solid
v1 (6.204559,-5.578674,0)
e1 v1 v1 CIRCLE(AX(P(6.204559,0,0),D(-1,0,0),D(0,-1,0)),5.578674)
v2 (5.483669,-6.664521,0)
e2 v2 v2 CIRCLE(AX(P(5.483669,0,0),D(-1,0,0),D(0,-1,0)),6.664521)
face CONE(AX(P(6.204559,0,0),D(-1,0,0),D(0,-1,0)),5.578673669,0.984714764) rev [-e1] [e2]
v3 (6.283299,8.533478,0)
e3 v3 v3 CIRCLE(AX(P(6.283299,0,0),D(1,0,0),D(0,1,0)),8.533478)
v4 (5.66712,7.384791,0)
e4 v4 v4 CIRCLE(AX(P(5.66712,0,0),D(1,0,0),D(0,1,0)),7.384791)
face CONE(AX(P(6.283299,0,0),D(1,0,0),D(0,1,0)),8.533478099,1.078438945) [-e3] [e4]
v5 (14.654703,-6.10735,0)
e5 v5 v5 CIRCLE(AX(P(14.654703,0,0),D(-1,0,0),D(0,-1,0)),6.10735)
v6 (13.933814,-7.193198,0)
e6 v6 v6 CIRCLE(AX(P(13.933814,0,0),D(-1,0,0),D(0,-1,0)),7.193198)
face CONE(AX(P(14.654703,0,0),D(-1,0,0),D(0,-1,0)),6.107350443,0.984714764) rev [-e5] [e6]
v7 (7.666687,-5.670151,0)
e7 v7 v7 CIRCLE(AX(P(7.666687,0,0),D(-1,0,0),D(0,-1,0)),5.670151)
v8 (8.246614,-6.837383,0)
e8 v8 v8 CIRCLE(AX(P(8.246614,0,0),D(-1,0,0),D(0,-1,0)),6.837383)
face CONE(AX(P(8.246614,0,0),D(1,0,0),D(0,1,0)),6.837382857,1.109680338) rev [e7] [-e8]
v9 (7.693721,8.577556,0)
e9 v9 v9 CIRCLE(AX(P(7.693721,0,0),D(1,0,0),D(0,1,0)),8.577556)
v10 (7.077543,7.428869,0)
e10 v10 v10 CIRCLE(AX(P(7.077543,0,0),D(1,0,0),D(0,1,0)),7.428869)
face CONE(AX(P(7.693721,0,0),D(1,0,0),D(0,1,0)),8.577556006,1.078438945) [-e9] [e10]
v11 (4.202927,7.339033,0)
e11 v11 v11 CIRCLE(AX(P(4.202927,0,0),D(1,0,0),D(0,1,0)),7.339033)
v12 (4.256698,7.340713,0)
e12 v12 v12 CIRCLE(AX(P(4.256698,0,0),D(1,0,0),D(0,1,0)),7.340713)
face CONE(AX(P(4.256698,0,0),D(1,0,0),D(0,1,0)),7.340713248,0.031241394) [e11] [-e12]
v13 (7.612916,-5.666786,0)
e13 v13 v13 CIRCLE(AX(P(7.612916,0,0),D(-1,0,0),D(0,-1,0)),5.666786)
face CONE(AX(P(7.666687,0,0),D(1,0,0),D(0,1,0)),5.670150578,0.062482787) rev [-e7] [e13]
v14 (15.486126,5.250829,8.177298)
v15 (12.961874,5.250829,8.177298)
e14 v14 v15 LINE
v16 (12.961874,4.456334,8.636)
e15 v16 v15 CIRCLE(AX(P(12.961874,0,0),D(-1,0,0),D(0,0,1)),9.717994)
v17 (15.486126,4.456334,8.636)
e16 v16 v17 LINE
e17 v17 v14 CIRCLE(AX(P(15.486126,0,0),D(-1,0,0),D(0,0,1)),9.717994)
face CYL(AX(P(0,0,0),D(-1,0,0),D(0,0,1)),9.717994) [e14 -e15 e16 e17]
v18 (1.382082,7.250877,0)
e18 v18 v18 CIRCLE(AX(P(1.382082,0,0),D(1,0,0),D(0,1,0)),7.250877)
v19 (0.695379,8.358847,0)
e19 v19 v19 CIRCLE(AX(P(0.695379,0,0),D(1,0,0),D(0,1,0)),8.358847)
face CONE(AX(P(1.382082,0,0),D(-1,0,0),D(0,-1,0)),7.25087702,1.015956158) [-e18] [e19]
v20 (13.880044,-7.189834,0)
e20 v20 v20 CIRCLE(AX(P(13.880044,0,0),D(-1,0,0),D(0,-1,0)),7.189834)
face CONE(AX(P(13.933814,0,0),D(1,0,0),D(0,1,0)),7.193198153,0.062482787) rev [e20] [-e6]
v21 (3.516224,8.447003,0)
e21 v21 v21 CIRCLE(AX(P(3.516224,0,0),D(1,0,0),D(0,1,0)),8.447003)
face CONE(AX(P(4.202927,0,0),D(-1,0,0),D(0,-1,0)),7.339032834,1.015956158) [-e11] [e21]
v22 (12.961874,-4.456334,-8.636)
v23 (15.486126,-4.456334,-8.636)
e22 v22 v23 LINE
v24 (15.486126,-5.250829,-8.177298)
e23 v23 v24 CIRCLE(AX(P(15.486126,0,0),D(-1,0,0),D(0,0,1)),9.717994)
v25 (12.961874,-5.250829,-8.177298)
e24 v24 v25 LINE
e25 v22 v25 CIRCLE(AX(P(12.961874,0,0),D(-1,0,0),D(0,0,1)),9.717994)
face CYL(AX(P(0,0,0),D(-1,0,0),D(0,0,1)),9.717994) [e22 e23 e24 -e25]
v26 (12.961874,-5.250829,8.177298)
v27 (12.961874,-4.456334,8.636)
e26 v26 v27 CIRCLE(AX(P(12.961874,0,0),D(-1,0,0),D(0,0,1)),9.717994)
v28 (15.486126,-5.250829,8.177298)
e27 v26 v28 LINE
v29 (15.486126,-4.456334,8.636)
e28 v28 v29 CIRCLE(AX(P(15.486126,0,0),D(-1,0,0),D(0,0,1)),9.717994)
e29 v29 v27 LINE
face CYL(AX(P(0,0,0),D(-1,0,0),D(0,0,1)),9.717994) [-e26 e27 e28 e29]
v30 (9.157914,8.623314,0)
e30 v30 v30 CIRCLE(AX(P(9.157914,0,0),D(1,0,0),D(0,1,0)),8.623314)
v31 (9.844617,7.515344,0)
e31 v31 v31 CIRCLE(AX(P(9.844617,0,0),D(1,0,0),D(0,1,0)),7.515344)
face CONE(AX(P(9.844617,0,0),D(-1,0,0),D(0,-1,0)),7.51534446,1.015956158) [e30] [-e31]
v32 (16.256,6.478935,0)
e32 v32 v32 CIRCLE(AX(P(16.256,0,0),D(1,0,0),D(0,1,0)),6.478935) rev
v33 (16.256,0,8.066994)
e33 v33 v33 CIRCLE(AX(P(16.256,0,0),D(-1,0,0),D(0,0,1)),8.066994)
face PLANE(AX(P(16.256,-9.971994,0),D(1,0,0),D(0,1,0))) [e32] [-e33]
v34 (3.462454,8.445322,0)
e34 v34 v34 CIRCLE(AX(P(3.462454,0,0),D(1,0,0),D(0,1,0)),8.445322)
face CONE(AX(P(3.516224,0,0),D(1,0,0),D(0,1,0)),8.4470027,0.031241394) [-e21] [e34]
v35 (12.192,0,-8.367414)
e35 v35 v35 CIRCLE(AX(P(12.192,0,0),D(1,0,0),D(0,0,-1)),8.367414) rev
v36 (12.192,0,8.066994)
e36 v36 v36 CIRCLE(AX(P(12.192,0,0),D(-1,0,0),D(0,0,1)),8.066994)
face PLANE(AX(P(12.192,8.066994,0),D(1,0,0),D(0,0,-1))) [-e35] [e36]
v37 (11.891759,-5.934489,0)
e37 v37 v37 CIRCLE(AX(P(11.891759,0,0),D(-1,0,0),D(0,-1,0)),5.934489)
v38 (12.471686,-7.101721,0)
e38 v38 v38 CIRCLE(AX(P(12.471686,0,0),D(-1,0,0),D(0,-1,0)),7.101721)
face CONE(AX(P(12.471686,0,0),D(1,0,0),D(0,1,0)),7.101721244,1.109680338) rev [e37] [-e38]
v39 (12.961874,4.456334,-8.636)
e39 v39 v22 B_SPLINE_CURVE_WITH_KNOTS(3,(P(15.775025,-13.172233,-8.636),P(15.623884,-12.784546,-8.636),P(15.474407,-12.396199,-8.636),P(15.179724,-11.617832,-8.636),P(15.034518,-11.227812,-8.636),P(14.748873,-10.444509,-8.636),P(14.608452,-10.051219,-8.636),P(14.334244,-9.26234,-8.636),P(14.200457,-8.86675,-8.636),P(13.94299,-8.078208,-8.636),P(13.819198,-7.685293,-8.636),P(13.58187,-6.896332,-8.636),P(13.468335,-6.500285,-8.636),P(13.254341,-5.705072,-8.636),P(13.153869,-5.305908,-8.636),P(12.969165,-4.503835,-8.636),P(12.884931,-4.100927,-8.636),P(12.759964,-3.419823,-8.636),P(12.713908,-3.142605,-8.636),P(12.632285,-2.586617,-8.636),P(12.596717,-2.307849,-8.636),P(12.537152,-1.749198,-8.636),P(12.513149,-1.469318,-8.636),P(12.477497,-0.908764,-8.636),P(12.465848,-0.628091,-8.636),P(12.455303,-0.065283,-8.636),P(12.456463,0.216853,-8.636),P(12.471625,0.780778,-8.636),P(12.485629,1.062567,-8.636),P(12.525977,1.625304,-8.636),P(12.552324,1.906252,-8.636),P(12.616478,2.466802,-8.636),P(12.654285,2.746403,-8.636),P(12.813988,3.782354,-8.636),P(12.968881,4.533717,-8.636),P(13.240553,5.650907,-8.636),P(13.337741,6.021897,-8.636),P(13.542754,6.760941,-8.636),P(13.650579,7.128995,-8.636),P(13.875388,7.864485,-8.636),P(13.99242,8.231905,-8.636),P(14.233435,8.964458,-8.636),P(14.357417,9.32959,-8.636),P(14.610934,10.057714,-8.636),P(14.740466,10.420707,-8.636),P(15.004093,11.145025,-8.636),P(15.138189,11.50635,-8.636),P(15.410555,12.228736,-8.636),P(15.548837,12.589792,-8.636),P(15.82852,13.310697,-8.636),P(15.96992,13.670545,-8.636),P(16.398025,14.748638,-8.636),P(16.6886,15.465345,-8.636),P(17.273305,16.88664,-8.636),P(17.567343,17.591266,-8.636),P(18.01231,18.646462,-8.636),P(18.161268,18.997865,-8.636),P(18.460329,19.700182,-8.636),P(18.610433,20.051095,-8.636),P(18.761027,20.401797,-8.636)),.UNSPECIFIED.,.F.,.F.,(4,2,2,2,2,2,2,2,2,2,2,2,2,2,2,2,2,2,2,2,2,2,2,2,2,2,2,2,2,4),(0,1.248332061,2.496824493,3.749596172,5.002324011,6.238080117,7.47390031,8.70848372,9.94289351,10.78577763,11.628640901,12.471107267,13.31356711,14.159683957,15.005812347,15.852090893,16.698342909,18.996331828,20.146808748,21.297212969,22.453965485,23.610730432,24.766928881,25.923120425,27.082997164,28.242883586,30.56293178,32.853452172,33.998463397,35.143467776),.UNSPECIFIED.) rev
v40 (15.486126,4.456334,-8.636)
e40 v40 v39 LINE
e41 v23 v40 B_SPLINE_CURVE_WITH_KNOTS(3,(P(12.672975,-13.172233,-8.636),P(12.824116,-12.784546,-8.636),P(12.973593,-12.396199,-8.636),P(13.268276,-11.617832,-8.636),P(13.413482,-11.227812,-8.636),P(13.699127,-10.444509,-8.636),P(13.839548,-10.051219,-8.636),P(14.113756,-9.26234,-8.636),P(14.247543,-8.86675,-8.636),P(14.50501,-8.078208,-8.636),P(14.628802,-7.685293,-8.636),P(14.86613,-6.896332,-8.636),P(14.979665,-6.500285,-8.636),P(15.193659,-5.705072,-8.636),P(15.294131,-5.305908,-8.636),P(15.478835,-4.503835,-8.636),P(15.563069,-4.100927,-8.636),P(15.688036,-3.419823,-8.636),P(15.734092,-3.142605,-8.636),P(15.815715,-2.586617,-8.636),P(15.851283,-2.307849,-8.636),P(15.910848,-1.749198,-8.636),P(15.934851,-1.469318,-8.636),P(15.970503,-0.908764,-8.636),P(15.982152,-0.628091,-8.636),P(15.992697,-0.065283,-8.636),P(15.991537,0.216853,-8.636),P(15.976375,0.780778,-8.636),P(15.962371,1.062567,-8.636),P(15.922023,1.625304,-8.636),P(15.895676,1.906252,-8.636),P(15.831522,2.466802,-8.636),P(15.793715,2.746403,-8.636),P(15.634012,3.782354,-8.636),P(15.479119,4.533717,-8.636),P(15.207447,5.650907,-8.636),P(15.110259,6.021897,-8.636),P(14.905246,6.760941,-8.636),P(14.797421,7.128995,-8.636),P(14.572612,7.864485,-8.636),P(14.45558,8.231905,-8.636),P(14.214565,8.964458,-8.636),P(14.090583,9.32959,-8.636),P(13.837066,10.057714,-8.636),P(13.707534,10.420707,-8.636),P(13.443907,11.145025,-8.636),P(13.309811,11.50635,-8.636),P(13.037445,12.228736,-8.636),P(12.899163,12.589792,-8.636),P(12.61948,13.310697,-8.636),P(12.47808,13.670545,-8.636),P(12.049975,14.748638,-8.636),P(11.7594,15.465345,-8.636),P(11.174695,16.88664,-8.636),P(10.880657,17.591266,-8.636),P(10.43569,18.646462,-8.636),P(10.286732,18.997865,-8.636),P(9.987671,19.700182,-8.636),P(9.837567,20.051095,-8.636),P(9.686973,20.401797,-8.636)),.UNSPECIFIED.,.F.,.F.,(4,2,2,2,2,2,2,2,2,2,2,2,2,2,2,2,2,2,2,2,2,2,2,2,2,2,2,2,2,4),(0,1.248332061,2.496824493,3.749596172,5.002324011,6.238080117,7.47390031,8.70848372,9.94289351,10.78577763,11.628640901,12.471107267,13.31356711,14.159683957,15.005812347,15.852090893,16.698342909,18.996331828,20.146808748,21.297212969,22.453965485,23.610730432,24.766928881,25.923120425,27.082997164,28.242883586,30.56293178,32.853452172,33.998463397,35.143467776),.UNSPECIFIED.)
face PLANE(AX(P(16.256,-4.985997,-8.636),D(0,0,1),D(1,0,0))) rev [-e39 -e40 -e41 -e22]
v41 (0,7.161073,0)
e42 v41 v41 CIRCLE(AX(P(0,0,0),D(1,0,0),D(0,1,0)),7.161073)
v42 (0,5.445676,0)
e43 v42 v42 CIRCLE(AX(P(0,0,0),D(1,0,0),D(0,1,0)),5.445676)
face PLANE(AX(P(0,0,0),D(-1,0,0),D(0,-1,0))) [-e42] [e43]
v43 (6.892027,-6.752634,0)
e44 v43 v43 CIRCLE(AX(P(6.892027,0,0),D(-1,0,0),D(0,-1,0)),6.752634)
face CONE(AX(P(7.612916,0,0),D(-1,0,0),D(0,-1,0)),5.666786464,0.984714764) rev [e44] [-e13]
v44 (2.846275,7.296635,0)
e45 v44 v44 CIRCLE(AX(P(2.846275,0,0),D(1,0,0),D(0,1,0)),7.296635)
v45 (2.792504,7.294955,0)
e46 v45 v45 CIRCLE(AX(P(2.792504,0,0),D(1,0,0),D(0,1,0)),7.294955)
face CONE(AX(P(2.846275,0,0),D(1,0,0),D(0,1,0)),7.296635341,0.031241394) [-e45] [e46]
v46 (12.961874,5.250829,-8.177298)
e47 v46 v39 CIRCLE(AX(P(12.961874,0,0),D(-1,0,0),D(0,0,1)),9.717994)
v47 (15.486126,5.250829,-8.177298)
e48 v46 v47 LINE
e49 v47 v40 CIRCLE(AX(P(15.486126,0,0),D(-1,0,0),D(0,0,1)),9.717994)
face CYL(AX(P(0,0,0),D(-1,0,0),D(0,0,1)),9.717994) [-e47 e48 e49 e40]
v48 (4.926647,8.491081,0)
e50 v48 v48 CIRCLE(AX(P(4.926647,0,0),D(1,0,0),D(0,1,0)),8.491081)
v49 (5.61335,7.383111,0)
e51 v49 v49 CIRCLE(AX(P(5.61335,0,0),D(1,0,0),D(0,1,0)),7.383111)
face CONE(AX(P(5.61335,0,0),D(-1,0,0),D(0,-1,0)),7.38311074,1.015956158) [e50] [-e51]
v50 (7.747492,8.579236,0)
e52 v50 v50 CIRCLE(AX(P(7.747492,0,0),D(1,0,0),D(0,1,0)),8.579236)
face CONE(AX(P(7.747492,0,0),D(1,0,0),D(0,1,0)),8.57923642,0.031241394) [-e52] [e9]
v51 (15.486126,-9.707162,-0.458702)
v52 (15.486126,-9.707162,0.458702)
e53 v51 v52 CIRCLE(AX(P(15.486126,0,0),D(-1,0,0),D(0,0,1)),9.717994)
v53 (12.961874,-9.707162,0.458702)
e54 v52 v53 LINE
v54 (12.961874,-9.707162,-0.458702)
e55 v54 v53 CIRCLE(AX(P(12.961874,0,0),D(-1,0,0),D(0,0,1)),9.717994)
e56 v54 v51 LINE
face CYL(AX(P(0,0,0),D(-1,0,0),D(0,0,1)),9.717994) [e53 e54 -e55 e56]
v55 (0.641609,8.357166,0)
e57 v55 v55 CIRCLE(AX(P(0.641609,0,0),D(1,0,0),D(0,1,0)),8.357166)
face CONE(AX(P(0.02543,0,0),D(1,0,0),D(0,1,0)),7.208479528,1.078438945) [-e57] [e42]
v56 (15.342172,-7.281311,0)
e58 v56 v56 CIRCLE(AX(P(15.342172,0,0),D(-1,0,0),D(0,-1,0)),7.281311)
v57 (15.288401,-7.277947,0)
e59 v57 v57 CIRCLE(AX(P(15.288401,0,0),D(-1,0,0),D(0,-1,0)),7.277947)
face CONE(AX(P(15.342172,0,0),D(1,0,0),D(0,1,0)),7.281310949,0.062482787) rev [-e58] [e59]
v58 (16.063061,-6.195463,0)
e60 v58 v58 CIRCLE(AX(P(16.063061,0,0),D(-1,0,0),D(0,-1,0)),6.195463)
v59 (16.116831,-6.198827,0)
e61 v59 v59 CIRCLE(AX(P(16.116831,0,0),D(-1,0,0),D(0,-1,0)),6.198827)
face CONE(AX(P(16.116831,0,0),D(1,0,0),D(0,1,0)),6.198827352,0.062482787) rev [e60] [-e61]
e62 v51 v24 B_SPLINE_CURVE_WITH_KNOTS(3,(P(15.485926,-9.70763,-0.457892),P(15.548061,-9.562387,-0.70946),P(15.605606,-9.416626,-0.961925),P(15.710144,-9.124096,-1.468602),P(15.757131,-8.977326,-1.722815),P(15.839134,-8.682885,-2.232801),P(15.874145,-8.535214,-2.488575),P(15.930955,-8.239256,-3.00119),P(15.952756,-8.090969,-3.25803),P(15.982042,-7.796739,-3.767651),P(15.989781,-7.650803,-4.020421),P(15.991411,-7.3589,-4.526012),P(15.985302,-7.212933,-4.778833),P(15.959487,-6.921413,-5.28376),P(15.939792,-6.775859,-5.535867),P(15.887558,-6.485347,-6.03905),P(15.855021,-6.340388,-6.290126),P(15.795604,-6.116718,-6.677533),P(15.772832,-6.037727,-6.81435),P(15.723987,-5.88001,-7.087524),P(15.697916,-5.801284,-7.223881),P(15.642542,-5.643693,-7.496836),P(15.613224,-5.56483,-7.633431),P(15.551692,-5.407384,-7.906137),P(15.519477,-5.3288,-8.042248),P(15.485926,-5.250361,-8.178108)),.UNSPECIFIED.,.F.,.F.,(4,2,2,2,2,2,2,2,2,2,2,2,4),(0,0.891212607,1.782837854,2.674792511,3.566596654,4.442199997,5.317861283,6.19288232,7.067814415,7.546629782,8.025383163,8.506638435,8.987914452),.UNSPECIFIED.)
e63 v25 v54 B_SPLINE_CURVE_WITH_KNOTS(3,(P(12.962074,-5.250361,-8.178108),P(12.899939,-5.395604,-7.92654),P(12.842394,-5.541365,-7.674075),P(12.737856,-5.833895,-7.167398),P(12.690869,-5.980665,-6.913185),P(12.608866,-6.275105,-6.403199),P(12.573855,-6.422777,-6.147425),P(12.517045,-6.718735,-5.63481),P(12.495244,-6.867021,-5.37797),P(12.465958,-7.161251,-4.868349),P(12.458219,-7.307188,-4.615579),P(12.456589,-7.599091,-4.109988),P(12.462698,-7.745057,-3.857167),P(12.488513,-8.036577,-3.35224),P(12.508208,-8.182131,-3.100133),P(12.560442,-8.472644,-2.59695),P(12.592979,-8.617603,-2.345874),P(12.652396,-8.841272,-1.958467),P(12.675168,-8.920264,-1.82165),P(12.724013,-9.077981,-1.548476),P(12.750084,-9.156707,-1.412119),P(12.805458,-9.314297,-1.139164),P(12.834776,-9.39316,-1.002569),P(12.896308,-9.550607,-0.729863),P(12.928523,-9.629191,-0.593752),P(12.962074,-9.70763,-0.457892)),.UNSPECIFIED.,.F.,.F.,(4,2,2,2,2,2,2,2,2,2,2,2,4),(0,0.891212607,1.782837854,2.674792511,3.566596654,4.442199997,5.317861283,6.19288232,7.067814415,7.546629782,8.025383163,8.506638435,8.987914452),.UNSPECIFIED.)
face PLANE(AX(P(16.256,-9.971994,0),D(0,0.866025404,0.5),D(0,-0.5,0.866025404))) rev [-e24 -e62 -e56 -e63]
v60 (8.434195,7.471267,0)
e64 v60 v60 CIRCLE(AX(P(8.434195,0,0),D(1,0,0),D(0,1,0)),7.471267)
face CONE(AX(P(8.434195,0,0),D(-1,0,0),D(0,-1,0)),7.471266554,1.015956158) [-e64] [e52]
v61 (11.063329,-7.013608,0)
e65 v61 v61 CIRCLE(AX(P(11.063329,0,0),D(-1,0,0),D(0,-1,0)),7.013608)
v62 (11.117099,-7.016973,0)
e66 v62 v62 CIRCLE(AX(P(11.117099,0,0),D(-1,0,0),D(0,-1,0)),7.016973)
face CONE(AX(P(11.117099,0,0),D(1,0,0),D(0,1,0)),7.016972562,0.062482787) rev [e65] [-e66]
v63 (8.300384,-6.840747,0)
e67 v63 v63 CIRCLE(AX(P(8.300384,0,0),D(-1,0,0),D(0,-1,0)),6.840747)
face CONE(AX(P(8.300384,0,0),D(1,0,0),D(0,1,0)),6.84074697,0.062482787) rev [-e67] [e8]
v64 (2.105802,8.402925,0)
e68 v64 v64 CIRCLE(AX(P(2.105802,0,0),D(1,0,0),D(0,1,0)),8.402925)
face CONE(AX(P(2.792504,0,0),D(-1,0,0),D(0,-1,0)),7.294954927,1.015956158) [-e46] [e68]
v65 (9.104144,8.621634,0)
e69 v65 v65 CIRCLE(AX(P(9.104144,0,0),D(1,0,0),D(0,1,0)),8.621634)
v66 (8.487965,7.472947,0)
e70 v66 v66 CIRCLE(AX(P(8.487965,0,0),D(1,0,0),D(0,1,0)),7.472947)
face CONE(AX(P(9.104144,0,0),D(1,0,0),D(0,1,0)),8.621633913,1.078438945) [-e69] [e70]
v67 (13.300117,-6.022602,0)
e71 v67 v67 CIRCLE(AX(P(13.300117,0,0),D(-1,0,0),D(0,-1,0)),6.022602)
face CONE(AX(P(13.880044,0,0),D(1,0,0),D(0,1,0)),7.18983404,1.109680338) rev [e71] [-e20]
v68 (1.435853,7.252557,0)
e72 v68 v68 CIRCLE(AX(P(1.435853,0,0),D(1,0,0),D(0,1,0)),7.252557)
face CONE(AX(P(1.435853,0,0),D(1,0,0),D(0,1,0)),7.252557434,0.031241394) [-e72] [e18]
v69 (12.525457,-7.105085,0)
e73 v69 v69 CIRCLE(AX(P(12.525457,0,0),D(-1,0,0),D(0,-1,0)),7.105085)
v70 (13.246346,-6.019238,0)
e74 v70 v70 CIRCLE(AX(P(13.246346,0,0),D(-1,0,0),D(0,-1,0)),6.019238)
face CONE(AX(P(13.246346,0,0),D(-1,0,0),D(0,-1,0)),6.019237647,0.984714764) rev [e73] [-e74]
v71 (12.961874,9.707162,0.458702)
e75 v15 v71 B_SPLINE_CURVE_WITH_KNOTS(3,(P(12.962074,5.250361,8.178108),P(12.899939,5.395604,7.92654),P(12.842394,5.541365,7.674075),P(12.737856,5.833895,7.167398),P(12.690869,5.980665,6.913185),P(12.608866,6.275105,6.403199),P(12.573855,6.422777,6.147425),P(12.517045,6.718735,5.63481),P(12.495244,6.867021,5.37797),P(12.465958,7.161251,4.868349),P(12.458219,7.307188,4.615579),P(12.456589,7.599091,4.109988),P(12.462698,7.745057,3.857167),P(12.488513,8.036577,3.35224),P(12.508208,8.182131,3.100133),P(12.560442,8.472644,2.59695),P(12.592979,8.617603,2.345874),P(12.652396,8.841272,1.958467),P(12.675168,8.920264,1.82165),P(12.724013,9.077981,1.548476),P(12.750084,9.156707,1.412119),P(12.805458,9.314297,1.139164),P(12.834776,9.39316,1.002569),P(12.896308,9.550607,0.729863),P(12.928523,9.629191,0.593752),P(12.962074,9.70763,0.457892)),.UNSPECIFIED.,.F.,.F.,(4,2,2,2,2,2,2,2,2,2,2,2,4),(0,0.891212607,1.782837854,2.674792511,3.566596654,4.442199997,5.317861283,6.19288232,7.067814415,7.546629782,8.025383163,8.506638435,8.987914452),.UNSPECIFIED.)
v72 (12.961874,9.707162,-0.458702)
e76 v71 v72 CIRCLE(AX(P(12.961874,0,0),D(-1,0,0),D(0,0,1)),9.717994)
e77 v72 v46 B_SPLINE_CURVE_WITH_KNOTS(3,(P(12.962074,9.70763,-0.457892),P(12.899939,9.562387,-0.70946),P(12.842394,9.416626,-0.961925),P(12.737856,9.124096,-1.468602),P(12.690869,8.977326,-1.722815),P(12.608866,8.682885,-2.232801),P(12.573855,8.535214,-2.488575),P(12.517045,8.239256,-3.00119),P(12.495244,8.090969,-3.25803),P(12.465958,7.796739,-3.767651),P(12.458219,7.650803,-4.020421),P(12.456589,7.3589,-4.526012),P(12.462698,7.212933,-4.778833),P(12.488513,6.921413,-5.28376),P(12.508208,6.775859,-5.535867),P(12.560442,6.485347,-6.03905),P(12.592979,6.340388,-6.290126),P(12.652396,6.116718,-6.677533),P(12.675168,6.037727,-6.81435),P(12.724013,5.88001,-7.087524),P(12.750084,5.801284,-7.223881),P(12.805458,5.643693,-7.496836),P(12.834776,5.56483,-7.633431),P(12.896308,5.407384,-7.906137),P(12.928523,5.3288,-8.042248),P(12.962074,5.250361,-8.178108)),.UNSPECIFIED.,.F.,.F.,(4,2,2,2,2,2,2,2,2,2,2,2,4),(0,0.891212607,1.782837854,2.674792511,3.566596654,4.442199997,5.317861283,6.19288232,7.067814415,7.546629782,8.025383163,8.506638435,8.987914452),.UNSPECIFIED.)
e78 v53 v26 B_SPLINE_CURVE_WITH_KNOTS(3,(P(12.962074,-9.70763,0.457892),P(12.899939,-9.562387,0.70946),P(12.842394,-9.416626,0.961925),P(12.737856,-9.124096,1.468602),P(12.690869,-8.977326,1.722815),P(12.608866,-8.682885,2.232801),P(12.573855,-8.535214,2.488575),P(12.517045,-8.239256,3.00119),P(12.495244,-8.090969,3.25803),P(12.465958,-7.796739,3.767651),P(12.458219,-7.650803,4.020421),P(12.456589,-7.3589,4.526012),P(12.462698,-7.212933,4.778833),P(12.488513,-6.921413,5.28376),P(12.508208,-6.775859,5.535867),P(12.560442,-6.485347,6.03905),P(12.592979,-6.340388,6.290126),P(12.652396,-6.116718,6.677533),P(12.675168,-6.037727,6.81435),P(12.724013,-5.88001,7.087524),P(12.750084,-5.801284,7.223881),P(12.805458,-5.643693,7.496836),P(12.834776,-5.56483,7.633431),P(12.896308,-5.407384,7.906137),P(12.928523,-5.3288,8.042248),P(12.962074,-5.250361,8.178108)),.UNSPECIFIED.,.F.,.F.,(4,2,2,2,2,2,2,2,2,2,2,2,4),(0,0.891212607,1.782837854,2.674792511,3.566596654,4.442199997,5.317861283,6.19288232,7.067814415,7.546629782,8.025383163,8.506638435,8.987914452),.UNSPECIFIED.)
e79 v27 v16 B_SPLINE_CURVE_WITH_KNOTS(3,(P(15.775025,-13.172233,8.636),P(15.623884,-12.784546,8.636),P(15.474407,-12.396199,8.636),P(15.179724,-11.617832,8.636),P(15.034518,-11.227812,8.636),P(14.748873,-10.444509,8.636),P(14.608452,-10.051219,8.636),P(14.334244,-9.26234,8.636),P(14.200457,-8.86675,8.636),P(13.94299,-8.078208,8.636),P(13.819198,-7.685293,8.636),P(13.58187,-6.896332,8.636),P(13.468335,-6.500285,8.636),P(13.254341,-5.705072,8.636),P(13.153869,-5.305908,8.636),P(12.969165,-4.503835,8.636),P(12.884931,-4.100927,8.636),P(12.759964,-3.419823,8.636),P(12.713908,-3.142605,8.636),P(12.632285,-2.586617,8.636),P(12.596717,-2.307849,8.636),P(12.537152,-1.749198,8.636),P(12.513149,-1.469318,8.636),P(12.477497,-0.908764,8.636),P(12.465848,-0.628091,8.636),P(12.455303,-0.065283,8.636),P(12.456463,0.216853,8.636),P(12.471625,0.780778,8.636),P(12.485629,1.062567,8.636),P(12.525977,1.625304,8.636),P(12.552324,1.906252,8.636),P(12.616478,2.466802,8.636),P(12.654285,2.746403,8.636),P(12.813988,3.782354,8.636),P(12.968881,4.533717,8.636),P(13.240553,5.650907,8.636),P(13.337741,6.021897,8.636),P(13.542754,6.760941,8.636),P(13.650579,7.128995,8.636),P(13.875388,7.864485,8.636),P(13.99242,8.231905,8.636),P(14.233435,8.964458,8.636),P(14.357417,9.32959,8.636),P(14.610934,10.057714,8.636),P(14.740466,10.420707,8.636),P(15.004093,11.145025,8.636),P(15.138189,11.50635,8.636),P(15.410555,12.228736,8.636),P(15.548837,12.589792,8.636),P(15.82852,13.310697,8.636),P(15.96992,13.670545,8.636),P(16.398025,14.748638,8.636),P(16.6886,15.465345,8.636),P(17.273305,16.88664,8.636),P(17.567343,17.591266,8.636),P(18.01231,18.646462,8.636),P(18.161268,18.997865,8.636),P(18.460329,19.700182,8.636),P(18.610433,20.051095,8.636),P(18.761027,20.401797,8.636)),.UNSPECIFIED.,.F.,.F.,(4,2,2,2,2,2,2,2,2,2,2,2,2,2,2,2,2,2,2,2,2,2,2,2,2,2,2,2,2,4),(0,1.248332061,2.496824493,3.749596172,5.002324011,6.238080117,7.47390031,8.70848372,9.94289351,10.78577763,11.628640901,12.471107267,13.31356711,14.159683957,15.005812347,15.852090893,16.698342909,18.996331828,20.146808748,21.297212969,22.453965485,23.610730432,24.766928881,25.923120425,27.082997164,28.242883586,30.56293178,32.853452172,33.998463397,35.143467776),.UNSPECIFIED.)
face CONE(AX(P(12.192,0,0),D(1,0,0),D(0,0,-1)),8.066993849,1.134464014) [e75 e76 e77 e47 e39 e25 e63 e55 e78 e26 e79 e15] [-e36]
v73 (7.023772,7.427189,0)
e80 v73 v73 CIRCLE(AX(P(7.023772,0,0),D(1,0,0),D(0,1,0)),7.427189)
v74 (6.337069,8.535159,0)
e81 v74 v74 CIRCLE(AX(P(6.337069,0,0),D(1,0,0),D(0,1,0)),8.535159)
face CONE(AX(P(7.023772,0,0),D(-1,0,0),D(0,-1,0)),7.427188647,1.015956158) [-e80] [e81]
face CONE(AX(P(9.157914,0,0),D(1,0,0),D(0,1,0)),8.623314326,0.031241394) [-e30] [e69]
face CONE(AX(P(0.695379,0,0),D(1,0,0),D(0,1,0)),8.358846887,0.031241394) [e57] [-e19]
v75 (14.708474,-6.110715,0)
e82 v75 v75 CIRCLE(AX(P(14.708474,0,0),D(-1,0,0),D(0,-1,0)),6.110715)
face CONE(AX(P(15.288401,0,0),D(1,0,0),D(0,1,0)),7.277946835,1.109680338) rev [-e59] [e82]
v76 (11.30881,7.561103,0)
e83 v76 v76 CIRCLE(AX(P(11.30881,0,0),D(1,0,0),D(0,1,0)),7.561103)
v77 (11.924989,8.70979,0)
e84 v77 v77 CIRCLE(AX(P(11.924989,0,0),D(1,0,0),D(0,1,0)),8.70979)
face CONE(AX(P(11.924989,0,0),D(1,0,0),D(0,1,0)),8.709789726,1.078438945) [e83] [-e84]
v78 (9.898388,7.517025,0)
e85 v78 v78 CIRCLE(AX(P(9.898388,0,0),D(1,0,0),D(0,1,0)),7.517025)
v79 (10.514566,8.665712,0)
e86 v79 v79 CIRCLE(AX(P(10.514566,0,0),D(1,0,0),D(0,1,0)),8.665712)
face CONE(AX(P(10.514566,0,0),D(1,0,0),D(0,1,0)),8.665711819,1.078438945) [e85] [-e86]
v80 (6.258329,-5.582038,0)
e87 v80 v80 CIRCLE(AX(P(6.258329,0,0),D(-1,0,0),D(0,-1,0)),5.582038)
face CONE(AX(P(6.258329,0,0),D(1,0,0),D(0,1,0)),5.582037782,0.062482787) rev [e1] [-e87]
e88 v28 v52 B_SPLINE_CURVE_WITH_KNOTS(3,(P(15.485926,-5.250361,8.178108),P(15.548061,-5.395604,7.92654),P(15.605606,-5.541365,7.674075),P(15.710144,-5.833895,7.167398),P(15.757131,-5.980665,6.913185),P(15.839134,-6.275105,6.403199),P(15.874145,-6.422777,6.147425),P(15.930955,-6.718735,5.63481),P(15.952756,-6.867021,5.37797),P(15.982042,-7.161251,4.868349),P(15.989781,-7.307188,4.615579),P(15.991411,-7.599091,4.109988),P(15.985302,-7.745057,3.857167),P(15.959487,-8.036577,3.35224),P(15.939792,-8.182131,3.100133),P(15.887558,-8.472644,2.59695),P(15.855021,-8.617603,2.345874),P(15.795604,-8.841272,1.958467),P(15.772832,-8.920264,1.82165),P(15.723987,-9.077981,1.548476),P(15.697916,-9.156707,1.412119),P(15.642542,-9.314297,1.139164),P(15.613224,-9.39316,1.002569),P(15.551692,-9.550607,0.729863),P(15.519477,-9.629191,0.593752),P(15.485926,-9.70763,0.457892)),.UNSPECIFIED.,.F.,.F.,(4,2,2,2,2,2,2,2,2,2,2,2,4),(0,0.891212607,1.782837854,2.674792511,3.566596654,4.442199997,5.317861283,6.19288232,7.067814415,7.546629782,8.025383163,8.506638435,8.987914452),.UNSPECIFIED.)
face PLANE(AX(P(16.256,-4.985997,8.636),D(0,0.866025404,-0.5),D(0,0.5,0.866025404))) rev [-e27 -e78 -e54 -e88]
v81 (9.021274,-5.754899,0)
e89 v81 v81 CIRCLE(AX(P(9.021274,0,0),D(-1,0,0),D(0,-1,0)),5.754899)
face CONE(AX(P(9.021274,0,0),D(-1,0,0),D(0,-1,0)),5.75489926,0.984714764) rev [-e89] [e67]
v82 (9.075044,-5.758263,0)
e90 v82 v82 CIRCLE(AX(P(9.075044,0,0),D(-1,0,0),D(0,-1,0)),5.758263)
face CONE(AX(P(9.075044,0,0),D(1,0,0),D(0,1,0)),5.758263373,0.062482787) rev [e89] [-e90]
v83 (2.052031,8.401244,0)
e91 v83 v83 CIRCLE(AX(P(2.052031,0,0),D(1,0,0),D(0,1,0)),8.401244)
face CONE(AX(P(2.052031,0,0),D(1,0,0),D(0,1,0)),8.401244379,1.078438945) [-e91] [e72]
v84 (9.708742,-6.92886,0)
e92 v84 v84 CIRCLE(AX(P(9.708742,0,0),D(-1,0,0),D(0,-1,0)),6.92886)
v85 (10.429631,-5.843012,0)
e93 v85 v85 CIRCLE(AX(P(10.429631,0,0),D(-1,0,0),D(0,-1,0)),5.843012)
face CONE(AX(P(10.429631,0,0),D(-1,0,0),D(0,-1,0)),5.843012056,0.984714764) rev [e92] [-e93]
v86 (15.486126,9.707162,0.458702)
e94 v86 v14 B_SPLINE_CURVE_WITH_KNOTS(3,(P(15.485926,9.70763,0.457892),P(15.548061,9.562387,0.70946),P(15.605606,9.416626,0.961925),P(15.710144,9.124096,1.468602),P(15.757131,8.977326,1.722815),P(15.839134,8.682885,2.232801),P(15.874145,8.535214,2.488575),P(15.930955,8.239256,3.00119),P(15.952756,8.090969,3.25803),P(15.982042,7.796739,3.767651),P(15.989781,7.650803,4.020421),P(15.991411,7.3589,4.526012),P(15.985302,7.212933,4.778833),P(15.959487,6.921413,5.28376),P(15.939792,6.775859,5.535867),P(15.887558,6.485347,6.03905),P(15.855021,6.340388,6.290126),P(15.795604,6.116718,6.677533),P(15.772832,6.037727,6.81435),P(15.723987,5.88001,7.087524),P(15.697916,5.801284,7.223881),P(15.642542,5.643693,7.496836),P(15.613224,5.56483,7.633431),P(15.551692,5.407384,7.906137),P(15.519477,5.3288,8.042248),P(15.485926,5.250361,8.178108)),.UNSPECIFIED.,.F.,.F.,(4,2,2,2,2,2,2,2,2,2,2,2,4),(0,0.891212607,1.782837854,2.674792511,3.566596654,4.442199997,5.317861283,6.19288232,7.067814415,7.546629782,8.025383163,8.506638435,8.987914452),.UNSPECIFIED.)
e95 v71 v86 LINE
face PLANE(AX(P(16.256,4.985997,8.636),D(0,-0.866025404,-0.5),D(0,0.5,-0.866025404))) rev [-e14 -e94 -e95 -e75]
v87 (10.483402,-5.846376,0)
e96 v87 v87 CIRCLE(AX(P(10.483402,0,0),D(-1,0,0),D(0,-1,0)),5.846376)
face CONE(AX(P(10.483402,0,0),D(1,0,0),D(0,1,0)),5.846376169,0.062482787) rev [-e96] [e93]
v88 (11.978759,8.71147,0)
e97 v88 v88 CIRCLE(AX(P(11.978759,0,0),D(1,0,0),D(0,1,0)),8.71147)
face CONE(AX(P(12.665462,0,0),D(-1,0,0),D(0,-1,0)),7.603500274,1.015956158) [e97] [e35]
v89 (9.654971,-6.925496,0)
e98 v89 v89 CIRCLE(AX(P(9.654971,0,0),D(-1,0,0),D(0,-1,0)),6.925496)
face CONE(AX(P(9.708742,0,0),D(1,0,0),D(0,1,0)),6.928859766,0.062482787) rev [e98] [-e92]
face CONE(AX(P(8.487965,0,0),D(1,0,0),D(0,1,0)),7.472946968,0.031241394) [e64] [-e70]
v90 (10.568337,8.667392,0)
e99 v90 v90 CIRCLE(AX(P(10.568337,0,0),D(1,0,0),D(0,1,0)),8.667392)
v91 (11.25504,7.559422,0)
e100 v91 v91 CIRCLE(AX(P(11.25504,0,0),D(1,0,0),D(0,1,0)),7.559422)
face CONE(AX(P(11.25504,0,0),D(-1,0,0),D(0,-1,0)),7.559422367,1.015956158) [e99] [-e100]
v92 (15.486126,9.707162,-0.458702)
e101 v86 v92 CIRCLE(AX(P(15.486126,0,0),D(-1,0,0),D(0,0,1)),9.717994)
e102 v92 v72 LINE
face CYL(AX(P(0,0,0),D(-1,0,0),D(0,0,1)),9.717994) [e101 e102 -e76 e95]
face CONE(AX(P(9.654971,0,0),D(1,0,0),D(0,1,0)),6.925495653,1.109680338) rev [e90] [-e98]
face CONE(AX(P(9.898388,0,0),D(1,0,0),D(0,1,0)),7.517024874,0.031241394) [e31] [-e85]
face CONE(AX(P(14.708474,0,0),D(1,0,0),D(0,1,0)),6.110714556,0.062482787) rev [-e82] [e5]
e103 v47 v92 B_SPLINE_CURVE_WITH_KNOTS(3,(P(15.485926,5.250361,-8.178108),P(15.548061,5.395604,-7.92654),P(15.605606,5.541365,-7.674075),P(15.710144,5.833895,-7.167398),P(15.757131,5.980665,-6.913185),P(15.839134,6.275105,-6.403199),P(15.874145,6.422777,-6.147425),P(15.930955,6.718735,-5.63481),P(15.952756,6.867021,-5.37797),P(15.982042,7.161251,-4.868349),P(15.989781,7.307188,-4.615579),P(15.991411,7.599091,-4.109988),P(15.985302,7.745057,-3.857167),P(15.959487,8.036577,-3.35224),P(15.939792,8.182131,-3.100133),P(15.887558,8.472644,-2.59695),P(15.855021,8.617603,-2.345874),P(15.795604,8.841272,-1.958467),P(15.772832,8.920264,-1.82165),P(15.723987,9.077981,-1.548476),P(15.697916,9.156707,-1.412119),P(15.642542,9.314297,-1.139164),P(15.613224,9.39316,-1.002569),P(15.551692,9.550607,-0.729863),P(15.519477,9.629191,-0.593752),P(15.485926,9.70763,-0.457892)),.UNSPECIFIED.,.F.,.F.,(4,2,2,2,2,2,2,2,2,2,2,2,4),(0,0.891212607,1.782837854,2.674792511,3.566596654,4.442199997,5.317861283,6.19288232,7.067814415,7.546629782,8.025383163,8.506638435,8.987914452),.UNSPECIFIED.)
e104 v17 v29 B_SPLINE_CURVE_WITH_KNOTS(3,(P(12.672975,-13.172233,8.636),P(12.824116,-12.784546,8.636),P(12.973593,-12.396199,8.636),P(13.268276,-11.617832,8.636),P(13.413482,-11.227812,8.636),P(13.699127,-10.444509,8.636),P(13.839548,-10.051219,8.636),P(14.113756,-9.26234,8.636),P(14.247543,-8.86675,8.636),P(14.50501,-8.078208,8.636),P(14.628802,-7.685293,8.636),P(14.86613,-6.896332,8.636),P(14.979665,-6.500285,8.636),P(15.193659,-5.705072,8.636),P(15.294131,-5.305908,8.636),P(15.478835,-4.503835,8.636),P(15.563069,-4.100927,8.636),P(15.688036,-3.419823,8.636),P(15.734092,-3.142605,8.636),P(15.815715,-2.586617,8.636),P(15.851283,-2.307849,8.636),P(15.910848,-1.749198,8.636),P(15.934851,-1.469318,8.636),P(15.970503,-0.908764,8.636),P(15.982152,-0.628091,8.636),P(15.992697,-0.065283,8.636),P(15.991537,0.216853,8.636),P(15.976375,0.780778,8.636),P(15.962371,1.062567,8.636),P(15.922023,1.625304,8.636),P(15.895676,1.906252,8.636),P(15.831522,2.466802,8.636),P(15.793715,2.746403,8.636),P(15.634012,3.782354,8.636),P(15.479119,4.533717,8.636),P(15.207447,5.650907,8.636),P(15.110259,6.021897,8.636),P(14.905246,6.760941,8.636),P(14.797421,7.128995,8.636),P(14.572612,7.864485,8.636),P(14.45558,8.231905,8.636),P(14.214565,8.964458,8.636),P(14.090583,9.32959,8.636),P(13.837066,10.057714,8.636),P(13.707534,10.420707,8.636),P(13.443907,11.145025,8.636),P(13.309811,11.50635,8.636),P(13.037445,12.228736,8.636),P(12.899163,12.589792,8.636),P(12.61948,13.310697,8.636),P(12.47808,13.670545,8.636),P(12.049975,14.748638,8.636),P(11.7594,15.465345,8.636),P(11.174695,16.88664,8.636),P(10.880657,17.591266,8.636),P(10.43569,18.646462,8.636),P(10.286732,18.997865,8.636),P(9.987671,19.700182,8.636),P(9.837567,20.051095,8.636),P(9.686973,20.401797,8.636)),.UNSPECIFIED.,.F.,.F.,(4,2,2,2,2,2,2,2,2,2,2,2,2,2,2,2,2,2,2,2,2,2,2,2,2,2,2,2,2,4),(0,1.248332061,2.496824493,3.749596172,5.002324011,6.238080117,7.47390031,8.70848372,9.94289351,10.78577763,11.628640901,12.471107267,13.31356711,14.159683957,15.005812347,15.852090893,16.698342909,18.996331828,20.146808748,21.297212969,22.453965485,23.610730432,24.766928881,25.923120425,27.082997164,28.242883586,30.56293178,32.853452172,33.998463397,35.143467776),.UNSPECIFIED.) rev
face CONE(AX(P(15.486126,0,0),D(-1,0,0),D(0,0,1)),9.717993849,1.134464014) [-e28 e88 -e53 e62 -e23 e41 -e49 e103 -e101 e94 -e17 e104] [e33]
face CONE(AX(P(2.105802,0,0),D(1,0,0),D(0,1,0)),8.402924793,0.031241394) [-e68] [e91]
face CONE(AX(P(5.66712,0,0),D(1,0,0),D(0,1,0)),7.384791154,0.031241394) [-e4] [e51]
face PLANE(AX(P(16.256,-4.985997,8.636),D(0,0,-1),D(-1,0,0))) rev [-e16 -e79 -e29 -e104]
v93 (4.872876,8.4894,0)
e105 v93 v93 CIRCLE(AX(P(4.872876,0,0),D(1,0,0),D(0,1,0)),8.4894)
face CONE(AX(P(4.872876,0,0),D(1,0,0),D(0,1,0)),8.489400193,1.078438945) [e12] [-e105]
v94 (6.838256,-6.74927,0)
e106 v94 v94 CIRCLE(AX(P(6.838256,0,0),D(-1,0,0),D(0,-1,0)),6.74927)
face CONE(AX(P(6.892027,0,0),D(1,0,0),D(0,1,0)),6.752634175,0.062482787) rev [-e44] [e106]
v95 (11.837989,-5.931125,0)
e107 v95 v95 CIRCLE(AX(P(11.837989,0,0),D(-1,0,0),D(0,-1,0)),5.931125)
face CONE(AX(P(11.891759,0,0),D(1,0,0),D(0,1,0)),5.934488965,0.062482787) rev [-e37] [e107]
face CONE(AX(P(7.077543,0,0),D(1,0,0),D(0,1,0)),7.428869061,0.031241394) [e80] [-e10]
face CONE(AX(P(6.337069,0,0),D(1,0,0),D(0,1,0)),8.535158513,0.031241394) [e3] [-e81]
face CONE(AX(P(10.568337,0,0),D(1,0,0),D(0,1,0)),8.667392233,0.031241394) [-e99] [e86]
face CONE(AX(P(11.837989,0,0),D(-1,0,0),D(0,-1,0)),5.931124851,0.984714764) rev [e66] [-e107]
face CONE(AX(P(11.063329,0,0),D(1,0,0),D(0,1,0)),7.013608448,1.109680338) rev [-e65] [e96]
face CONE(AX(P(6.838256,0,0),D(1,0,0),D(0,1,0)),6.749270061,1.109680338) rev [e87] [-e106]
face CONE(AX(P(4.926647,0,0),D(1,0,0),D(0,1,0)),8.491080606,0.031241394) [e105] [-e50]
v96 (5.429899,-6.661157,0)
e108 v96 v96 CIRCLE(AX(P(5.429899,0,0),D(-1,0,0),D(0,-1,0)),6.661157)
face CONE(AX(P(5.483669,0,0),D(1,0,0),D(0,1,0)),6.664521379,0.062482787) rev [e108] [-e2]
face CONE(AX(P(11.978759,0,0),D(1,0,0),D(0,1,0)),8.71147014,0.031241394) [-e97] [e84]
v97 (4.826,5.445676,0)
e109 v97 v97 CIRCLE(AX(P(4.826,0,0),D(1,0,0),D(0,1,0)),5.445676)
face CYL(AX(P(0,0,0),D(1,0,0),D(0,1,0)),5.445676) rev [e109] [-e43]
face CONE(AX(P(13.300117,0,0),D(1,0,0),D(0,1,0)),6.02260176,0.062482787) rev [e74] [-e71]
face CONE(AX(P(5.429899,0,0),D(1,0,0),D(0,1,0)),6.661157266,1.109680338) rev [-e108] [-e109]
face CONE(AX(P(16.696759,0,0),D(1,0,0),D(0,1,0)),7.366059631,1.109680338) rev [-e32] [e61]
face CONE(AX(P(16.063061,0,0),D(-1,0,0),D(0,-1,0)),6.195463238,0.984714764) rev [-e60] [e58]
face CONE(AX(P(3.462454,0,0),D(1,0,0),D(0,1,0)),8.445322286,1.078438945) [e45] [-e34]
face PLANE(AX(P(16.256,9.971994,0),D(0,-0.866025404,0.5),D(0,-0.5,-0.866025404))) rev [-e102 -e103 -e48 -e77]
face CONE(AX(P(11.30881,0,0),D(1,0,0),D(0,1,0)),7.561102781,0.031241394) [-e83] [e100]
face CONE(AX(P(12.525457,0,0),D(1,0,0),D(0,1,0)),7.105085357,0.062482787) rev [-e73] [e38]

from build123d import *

# Parameters (mm, degrees)
EXTRUDE1_DEPTH = 4.064
SKETCH14_W     = 4.826
SKETCH14_H     = 5.445676263


# Read off the part's stored shape, not the designer's step: Cut-Revolve5
with BuildPart() as part:
    # Sketch1 → Revolve1 (revolve)
    with BuildSketch(Plane.XY):
        Polygon((0, 0), (0, 7.161072654), (0.025429996, 7.208479528), (0.64160868, 8.357166473), (0.695379235, 8.358846887), (1.382081969, 7.25087702), (1.435852524, 7.252557434), (2.052031208, 8.401244379), (2.105801763, 8.402924793), (2.792504496, 7.294954927), (2.846275051, 7.296635341), (3.462453735, 8.445322286), (3.51622429, 8.4470027), (4.202927024, 7.339032834), (4.256697579, 7.340713248), (4.872876263, 8.489400193), (4.926646818, 8.491080606), (5.613349551, 7.38311074), (5.667120106, 7.384791154), (6.28329879, 8.533478099), (6.337069345, 8.535158513), (7.023772079, 7.427188647), (7.077542634, 7.428869061), (7.693721318, 8.577556006), (7.747491873, 8.57923642), (8.434194606, 7.471266554), (8.487965161, 7.472946968), (9.104143845, 8.621633913), (9.1579144, 8.623314326), (9.844617134, 7.51534446), (9.898387689, 7.517024874), (10.514566373, 8.665711819), (10.568336928, 8.667392233), (11.255039661, 7.559422367), (11.308810216, 7.561102781), (11.9249889, 8.709789726), (11.978759455, 8.71147014), (12.665462189, 7.603500274), (12.719232744, 7.605180687), (13.335411428, 8.753867633), (13.389181983, 8.755548046), (14.075884716, 7.64757818), (14.129655271, 7.649258594), (14.745833955, 8.797945539), (14.79960451, 8.799625953), (15.486307244, 7.691656087), (15.540077799, 7.693336501), (16.156256483, 8.842023446), (16.210027038, 8.84370386), (16.896729771, 7.735733994), (16.950500326, 7.737414407), (16.950500326, 0), align=None)
    revolve(axis=Axis((0, 0, 0), (-1, 0, 0)))

    # Sketch5 → Cut-Revolve2 (revolve, cut)
    with BuildSketch(Plane.XY, mode=Mode.PRIVATE) as cut_revolve2_sk:
        Polygon((12.192, 0), (12.192, 8.71813424), (16.950500326, 8.866844806), (16.950500326, 0), align=None)
    revolve(cut_revolve2_sk.sketch.rotate(Axis((0, 0, 0), (-1, 0, 0)), 180), axis=Axis((0, 0, 0), (-1, 0, 0)), mode=Mode.SUBTRACT)

    # Sketch7 → Extrude1 (add)
    with BuildSketch(Plane(origin=(12.192, 0, 0), x_dir=(0, 0, -1), z_dir=(1, 0, 0))):
        Polygon((-8.636, -4.985996925), (-8.636, 4.985996925), (0, 9.971993849), (8.636, 4.985996925), (8.636, -4.985996925), (0, -9.971993849), align=None)
    extrude(amount=EXTRUDE1_DEPTH)

    # Sketch10 → Cut-Revolve4 (revolve, cut)
    with BuildSketch(Plane.XY, mode=Mode.PRIVATE) as cut_revolve4_sk:
        Polygon((16.256, 9.971993849), (12.192, 9.971993849), (12.192, 8.066993849), (12.961873944, 9.717993849), (15.486126056, 9.717993849), (16.256, 8.066993849), align=None)
    revolve(cut_revolve4_sk.sketch.rotate(Axis((0, 0, 0), (1, 0, 0)), 297.29455937), axis=Axis((0, 0, 0), (1, 0, 0)), mode=Mode.SUBTRACT)

    # Cut-Revolve5 outline → Cut-Revolve5 (revolve, cut)
    with BuildSketch(Plane.YX):
        Polygon((0, 16.256), (0, 4.826), (5.445676263, 4.826), (6.661157266, 5.429898935), (6.664521379, 5.48366949), (5.578673669, 6.204558764), (5.582037782, 6.258329319), (6.749270061, 6.838256384), (6.752634175, 6.892026939), (5.666786464, 7.612916212), (5.670150578, 7.666686767), (6.837382857, 8.246613832), (6.84074697, 8.300384387), (5.75489926, 9.021273661), (5.758263373, 9.075044216), (6.925495653, 9.654971281), (6.928859766, 9.708741836), (5.843012056, 10.42963111), (5.846376169, 10.483401665), (7.013608448, 11.063328729), (7.016972562, 11.117099284), (5.931124851, 11.837988558), (5.934488965, 11.891759113), (7.101721244, 12.471686178), (7.105085357, 12.525456733), (6.019237647, 13.246346007), (6.02260176, 13.300116562), (7.18983404, 13.880043627), (7.193198153, 13.933814182), (6.107350443, 14.654703455), (6.110714556, 14.70847401), (7.277946835, 15.288401075), (7.281310949, 15.34217163), (6.195463238, 16.063060904), (6.198827352, 16.116831459), (6.478935012, 16.256), align=None)
    revolve(axis=Axis((0, 0, 0), (1, 0, 0)), mode=Mode.SUBTRACT)

    # Sketch14 → Cut-Revolve6 (revolve, cut)
    with BuildSketch(Plane.XY, mode=Mode.PRIVATE) as cut_revolve6_sk:
        with Locations((2.413, 2.722838132)):
            Rectangle(SKETCH14_W, SKETCH14_H)
    revolve(cut_revolve6_sk.sketch.rotate(Axis((0, 0, 0), (-1, 0, 0)), 180), axis=Axis((0, 0, 0), (-1, 0, 0)), mode=Mode.SUBTRACT)


solid = part.part
